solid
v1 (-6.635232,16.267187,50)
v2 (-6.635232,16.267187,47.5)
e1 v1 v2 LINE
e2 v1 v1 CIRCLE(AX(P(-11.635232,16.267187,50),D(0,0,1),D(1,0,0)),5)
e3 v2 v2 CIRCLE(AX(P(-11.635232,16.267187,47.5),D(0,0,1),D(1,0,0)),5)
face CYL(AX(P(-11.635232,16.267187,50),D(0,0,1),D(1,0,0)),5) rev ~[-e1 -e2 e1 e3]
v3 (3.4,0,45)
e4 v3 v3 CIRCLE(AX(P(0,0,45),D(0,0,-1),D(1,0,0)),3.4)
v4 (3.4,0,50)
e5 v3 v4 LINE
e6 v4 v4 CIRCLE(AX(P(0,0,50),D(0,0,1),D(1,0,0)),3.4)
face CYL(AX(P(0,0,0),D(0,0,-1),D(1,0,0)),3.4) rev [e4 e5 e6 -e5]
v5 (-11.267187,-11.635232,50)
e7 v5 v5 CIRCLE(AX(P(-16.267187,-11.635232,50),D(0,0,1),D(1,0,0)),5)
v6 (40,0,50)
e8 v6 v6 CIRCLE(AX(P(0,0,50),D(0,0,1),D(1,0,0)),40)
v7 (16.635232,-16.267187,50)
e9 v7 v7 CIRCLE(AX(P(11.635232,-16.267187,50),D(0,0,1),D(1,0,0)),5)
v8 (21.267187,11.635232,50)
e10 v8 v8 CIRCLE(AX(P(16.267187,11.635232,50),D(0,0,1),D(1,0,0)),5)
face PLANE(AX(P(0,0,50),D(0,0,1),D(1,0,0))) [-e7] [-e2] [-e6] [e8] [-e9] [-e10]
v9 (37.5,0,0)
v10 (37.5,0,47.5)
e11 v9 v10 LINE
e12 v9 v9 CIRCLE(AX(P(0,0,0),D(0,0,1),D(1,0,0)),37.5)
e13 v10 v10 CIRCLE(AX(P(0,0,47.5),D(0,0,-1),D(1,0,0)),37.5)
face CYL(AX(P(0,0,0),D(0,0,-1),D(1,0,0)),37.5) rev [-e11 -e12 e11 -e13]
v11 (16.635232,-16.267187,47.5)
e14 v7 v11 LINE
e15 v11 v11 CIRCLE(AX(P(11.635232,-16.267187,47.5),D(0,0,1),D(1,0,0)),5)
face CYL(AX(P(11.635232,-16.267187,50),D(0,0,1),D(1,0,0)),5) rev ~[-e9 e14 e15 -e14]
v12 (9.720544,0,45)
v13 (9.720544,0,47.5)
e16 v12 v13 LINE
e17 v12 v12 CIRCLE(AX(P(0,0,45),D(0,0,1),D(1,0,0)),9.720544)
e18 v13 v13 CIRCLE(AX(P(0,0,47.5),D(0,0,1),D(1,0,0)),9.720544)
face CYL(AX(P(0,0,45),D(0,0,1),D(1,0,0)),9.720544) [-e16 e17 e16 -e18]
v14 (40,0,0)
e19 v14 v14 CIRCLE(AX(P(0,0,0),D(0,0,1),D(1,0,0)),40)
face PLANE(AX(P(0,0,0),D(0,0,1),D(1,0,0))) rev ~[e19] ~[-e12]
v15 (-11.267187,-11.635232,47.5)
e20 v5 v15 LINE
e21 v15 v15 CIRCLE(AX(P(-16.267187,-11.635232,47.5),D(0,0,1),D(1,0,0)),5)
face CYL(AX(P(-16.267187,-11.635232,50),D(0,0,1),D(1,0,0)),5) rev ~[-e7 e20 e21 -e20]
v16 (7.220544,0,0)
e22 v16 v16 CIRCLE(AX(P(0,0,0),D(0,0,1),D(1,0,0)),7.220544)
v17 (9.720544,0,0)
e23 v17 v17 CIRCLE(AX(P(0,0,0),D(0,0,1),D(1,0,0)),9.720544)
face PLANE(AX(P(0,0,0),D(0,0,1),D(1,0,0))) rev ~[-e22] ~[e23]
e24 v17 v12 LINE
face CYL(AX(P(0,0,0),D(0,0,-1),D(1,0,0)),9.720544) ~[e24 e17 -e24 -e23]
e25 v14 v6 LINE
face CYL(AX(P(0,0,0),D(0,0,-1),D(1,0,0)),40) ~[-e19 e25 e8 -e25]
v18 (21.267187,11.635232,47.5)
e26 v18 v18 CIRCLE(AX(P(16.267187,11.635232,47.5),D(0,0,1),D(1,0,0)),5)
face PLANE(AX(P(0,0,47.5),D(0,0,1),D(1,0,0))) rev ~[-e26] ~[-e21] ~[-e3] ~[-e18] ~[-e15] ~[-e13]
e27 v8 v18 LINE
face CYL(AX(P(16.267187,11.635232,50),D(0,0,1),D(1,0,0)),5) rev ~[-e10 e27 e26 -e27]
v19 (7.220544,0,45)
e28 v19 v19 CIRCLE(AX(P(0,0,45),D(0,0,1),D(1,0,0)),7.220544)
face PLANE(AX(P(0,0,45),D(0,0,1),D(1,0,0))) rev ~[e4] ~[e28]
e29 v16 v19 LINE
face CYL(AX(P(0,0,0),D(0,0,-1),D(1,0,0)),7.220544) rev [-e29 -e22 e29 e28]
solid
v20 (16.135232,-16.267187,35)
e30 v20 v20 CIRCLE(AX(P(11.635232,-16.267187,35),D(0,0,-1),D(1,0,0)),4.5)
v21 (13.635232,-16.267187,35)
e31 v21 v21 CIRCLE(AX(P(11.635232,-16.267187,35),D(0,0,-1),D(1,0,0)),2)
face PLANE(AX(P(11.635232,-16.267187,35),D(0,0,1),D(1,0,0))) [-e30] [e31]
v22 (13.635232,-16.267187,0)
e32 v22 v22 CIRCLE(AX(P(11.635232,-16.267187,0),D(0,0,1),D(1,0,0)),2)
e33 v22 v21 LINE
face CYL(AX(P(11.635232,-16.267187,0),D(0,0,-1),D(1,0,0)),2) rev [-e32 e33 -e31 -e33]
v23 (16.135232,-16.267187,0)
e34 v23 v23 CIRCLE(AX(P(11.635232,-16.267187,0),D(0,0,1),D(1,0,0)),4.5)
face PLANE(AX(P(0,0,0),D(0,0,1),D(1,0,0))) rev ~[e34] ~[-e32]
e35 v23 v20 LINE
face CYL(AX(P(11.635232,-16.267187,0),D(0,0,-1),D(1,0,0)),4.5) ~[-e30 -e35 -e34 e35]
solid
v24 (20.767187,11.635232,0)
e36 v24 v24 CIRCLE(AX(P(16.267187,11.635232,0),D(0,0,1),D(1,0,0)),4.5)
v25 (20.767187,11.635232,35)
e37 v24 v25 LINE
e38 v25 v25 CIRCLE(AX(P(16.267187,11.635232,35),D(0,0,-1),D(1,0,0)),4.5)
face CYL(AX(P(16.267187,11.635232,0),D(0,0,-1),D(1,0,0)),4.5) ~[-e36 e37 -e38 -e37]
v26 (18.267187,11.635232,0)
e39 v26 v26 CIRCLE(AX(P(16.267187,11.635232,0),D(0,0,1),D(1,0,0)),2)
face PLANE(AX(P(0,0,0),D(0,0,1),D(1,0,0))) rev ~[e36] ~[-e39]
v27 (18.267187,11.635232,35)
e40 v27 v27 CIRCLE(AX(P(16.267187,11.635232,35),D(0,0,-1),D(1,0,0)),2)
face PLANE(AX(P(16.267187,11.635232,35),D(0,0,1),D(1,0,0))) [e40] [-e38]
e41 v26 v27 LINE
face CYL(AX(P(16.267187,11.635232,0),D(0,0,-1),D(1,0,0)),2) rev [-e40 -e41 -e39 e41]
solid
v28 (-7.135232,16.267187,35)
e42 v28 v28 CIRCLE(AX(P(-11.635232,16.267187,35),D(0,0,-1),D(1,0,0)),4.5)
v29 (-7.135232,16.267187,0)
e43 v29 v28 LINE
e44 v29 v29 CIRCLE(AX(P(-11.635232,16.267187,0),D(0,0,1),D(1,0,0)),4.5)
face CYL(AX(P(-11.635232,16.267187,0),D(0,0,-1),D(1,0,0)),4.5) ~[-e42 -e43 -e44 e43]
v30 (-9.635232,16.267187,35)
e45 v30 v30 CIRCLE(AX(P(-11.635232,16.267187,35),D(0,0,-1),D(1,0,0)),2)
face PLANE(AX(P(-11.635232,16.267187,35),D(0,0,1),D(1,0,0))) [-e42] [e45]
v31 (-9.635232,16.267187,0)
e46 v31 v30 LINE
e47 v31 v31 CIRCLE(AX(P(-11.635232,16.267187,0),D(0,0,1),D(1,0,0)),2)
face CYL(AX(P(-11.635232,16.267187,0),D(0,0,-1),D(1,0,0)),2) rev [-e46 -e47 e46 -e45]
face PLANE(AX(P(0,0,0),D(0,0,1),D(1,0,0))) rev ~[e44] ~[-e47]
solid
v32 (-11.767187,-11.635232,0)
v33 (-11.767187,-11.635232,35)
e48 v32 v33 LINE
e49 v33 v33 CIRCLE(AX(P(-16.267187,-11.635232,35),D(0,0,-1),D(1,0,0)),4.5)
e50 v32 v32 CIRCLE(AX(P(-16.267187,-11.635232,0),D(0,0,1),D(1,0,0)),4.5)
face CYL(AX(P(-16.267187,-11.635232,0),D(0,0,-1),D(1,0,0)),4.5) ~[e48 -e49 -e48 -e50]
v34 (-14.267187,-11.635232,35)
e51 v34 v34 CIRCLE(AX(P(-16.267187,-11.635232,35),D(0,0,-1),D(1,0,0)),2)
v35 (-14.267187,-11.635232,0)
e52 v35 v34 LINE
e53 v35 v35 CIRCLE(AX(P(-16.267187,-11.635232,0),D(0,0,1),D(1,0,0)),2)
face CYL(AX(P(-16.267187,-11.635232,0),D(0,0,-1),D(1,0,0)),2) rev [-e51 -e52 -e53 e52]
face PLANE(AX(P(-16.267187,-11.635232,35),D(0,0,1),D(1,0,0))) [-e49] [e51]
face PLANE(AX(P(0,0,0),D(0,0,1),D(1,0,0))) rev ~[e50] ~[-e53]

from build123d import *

# Parameters (mm, degrees)
F0_R      = 40
F0_R_2    = 2
F0_R_3    = 3.4
F1_DEPTH  = 50
F2_R      = 7.220544461
F3_DEPTH  = 45
F4_R      = 5
F5_DEPTH  = 10
F6_T      = 2.5
F5_FACE_R = 5
F7_DEPTH  = 15


# Not quite as in the source:
# - a shell that OpenCascade refuses in one call is made with other operations: the cavity is built on its own and cut out


with BuildPart() as f1:
    # F0 (on Top) → F1 (new body)
    with BuildSketch(Plane.XY):
        Circle(F0_R)
        with Locations((-16.2671870079, -11.6352321356)):
            Circle(F0_R_2, mode=Mode.SUBTRACT)
        with Locations((11.6352321356, -16.2671870079)):
            Circle(F0_R_2, mode=Mode.SUBTRACT)
        with Locations((-11.6352321356, 16.2671870079)):
            Circle(F0_R_2, mode=Mode.SUBTRACT)
        Circle(F0_R_3, mode=Mode.SUBTRACT)
        with Locations((16.2671870079, 11.6352321356)):
            Circle(F0_R_2, mode=Mode.SUBTRACT)
    extrude(amount=F1_DEPTH)

    # F2 (on Top) → F3 (cut)
    with BuildSketch(Plane.XY):
        Circle(F2_R)
    extrude(amount=F3_DEPTH, mode=Mode.SUBTRACT)

    # F6: shell of thickness 2.5, made by hand


with BuildPart() as f5:
    # F4 (on face) → F5 (new body)
    with BuildSketch(Plane.XY.offset(50)):
        with Locations((-11.6352321356, 16.2671870079)):
            Circle(F4_R)
    extrude(amount=-F5_DEPTH)


with BuildPart() as f5b:
    # F4 (on face) → F5, piece 2 (new body)
    with BuildSketch(Plane.XY.offset(50)):
        with Locations((16.2671870079, 11.6352321356)):
            Circle(F4_R)
    extrude(amount=-F5_DEPTH)


with BuildPart() as f5c:
    # F4 (on face) → F5, piece 3 (new body)
    with BuildSketch(Plane.XY.offset(50)):
        with Locations((11.6352321356, -16.2671870079)):
            Circle(F4_R)
    extrude(amount=-F5_DEPTH)


with BuildPart() as f5d:
    # F4 (on face) → F5, piece 4 (new body)
    with BuildSketch(Plane.XY.offset(50)):
        with Locations((-16.2671870079, -11.6352321356)):
            Circle(F4_R)
    extrude(amount=-F5_DEPTH)


with BuildPart() as f6_core1:
    # F6_t2: copy of F1
    add(f1.part)

    # the walls: a layer under each face that stays
    f6_faces = [f6_core1.faces().sort_by_distance(p)[0] for p in [
        (-40, 0, 25),
        (-26.6666666667, -26.6666666667, 50),
        (-18.2671870079, -11.6352321356, 25),
        (9.6352321356, -16.2671870079, 25),
        (-7.220544461, 0, 22.5),
        (-13.6352321356, 16.2671870079, 25),
        (14.2671870079, 11.6352321356, 25),
        (-3.4, 0, 47.5),
        (-4.8136963073, -4.8136963073, 45),
    ]]
    thicken(f6_faces, amount=-F6_T, mode=Mode.SUBTRACT)

    # F6_s3 → F6_t4 (revolve, cut)
    with BuildSketch(Plane.XZ):
        Polygon((7.195544461, 44.975), (9.720544461, 45), (9.720544461, 47.5), (7.220544461, 47.5), align=None)
    revolve(axis=Axis((0, 0, 45), (0, 0, 1)), mode=Mode.SUBTRACT)


with BuildPart() as f1_1:
    add(f1.part)

    # what is left inside the walls is the cavity
    f6_cavity = [f6_core1.part.solids().sort_by_distance(p)[0] for p in [
        (-37.475, 0, 31.666667),
    ]]
    add(f6_cavity, mode=Mode.SUBTRACT)


with BuildPart() as f7_tool:
    # F5_face (on face) → F7 (new body)
    with BuildSketch(Plane(origin=(-11.6352321356, 16.2671870079, 50), x_dir=(1, 0, 0), z_dir=(0, 0, 1))):
        Circle(F5_FACE_R)
        with Locations((23.2704642711, -32.5343740159)):
            Circle(F5_FACE_R)
        with Locations((27.9024191435, -4.6319548724)):
            Circle(F5_FACE_R)
        with Locations((-4.6319548724, -27.9024191435)):
            Circle(F5_FACE_R)
    extrude(amount=-F7_DEPTH)


with BuildPart() as f1_2:
    add(f1_1.part)

    # F7: cut by f7_tool
    add(f7_tool.part, mode=Mode.SUBTRACT)


with BuildPart() as f5_1:
    add(f5.part)

    # F7: cut by f7_tool
    add(f7_tool.part, mode=Mode.SUBTRACT)


with BuildPart() as f5b_1:
    add(f5b.part)

    # F7: cut by f7_tool
    add(f7_tool.part, mode=Mode.SUBTRACT)


with BuildPart() as f5c_1:
    add(f5c.part)

    # F7: cut by f7_tool
    add(f7_tool.part, mode=Mode.SUBTRACT)


with BuildPart() as f5d_1:
    add(f5d.part)

    # F7: cut by f7_tool
    add(f7_tool.part, mode=Mode.SUBTRACT)


solid = f1_2.part
